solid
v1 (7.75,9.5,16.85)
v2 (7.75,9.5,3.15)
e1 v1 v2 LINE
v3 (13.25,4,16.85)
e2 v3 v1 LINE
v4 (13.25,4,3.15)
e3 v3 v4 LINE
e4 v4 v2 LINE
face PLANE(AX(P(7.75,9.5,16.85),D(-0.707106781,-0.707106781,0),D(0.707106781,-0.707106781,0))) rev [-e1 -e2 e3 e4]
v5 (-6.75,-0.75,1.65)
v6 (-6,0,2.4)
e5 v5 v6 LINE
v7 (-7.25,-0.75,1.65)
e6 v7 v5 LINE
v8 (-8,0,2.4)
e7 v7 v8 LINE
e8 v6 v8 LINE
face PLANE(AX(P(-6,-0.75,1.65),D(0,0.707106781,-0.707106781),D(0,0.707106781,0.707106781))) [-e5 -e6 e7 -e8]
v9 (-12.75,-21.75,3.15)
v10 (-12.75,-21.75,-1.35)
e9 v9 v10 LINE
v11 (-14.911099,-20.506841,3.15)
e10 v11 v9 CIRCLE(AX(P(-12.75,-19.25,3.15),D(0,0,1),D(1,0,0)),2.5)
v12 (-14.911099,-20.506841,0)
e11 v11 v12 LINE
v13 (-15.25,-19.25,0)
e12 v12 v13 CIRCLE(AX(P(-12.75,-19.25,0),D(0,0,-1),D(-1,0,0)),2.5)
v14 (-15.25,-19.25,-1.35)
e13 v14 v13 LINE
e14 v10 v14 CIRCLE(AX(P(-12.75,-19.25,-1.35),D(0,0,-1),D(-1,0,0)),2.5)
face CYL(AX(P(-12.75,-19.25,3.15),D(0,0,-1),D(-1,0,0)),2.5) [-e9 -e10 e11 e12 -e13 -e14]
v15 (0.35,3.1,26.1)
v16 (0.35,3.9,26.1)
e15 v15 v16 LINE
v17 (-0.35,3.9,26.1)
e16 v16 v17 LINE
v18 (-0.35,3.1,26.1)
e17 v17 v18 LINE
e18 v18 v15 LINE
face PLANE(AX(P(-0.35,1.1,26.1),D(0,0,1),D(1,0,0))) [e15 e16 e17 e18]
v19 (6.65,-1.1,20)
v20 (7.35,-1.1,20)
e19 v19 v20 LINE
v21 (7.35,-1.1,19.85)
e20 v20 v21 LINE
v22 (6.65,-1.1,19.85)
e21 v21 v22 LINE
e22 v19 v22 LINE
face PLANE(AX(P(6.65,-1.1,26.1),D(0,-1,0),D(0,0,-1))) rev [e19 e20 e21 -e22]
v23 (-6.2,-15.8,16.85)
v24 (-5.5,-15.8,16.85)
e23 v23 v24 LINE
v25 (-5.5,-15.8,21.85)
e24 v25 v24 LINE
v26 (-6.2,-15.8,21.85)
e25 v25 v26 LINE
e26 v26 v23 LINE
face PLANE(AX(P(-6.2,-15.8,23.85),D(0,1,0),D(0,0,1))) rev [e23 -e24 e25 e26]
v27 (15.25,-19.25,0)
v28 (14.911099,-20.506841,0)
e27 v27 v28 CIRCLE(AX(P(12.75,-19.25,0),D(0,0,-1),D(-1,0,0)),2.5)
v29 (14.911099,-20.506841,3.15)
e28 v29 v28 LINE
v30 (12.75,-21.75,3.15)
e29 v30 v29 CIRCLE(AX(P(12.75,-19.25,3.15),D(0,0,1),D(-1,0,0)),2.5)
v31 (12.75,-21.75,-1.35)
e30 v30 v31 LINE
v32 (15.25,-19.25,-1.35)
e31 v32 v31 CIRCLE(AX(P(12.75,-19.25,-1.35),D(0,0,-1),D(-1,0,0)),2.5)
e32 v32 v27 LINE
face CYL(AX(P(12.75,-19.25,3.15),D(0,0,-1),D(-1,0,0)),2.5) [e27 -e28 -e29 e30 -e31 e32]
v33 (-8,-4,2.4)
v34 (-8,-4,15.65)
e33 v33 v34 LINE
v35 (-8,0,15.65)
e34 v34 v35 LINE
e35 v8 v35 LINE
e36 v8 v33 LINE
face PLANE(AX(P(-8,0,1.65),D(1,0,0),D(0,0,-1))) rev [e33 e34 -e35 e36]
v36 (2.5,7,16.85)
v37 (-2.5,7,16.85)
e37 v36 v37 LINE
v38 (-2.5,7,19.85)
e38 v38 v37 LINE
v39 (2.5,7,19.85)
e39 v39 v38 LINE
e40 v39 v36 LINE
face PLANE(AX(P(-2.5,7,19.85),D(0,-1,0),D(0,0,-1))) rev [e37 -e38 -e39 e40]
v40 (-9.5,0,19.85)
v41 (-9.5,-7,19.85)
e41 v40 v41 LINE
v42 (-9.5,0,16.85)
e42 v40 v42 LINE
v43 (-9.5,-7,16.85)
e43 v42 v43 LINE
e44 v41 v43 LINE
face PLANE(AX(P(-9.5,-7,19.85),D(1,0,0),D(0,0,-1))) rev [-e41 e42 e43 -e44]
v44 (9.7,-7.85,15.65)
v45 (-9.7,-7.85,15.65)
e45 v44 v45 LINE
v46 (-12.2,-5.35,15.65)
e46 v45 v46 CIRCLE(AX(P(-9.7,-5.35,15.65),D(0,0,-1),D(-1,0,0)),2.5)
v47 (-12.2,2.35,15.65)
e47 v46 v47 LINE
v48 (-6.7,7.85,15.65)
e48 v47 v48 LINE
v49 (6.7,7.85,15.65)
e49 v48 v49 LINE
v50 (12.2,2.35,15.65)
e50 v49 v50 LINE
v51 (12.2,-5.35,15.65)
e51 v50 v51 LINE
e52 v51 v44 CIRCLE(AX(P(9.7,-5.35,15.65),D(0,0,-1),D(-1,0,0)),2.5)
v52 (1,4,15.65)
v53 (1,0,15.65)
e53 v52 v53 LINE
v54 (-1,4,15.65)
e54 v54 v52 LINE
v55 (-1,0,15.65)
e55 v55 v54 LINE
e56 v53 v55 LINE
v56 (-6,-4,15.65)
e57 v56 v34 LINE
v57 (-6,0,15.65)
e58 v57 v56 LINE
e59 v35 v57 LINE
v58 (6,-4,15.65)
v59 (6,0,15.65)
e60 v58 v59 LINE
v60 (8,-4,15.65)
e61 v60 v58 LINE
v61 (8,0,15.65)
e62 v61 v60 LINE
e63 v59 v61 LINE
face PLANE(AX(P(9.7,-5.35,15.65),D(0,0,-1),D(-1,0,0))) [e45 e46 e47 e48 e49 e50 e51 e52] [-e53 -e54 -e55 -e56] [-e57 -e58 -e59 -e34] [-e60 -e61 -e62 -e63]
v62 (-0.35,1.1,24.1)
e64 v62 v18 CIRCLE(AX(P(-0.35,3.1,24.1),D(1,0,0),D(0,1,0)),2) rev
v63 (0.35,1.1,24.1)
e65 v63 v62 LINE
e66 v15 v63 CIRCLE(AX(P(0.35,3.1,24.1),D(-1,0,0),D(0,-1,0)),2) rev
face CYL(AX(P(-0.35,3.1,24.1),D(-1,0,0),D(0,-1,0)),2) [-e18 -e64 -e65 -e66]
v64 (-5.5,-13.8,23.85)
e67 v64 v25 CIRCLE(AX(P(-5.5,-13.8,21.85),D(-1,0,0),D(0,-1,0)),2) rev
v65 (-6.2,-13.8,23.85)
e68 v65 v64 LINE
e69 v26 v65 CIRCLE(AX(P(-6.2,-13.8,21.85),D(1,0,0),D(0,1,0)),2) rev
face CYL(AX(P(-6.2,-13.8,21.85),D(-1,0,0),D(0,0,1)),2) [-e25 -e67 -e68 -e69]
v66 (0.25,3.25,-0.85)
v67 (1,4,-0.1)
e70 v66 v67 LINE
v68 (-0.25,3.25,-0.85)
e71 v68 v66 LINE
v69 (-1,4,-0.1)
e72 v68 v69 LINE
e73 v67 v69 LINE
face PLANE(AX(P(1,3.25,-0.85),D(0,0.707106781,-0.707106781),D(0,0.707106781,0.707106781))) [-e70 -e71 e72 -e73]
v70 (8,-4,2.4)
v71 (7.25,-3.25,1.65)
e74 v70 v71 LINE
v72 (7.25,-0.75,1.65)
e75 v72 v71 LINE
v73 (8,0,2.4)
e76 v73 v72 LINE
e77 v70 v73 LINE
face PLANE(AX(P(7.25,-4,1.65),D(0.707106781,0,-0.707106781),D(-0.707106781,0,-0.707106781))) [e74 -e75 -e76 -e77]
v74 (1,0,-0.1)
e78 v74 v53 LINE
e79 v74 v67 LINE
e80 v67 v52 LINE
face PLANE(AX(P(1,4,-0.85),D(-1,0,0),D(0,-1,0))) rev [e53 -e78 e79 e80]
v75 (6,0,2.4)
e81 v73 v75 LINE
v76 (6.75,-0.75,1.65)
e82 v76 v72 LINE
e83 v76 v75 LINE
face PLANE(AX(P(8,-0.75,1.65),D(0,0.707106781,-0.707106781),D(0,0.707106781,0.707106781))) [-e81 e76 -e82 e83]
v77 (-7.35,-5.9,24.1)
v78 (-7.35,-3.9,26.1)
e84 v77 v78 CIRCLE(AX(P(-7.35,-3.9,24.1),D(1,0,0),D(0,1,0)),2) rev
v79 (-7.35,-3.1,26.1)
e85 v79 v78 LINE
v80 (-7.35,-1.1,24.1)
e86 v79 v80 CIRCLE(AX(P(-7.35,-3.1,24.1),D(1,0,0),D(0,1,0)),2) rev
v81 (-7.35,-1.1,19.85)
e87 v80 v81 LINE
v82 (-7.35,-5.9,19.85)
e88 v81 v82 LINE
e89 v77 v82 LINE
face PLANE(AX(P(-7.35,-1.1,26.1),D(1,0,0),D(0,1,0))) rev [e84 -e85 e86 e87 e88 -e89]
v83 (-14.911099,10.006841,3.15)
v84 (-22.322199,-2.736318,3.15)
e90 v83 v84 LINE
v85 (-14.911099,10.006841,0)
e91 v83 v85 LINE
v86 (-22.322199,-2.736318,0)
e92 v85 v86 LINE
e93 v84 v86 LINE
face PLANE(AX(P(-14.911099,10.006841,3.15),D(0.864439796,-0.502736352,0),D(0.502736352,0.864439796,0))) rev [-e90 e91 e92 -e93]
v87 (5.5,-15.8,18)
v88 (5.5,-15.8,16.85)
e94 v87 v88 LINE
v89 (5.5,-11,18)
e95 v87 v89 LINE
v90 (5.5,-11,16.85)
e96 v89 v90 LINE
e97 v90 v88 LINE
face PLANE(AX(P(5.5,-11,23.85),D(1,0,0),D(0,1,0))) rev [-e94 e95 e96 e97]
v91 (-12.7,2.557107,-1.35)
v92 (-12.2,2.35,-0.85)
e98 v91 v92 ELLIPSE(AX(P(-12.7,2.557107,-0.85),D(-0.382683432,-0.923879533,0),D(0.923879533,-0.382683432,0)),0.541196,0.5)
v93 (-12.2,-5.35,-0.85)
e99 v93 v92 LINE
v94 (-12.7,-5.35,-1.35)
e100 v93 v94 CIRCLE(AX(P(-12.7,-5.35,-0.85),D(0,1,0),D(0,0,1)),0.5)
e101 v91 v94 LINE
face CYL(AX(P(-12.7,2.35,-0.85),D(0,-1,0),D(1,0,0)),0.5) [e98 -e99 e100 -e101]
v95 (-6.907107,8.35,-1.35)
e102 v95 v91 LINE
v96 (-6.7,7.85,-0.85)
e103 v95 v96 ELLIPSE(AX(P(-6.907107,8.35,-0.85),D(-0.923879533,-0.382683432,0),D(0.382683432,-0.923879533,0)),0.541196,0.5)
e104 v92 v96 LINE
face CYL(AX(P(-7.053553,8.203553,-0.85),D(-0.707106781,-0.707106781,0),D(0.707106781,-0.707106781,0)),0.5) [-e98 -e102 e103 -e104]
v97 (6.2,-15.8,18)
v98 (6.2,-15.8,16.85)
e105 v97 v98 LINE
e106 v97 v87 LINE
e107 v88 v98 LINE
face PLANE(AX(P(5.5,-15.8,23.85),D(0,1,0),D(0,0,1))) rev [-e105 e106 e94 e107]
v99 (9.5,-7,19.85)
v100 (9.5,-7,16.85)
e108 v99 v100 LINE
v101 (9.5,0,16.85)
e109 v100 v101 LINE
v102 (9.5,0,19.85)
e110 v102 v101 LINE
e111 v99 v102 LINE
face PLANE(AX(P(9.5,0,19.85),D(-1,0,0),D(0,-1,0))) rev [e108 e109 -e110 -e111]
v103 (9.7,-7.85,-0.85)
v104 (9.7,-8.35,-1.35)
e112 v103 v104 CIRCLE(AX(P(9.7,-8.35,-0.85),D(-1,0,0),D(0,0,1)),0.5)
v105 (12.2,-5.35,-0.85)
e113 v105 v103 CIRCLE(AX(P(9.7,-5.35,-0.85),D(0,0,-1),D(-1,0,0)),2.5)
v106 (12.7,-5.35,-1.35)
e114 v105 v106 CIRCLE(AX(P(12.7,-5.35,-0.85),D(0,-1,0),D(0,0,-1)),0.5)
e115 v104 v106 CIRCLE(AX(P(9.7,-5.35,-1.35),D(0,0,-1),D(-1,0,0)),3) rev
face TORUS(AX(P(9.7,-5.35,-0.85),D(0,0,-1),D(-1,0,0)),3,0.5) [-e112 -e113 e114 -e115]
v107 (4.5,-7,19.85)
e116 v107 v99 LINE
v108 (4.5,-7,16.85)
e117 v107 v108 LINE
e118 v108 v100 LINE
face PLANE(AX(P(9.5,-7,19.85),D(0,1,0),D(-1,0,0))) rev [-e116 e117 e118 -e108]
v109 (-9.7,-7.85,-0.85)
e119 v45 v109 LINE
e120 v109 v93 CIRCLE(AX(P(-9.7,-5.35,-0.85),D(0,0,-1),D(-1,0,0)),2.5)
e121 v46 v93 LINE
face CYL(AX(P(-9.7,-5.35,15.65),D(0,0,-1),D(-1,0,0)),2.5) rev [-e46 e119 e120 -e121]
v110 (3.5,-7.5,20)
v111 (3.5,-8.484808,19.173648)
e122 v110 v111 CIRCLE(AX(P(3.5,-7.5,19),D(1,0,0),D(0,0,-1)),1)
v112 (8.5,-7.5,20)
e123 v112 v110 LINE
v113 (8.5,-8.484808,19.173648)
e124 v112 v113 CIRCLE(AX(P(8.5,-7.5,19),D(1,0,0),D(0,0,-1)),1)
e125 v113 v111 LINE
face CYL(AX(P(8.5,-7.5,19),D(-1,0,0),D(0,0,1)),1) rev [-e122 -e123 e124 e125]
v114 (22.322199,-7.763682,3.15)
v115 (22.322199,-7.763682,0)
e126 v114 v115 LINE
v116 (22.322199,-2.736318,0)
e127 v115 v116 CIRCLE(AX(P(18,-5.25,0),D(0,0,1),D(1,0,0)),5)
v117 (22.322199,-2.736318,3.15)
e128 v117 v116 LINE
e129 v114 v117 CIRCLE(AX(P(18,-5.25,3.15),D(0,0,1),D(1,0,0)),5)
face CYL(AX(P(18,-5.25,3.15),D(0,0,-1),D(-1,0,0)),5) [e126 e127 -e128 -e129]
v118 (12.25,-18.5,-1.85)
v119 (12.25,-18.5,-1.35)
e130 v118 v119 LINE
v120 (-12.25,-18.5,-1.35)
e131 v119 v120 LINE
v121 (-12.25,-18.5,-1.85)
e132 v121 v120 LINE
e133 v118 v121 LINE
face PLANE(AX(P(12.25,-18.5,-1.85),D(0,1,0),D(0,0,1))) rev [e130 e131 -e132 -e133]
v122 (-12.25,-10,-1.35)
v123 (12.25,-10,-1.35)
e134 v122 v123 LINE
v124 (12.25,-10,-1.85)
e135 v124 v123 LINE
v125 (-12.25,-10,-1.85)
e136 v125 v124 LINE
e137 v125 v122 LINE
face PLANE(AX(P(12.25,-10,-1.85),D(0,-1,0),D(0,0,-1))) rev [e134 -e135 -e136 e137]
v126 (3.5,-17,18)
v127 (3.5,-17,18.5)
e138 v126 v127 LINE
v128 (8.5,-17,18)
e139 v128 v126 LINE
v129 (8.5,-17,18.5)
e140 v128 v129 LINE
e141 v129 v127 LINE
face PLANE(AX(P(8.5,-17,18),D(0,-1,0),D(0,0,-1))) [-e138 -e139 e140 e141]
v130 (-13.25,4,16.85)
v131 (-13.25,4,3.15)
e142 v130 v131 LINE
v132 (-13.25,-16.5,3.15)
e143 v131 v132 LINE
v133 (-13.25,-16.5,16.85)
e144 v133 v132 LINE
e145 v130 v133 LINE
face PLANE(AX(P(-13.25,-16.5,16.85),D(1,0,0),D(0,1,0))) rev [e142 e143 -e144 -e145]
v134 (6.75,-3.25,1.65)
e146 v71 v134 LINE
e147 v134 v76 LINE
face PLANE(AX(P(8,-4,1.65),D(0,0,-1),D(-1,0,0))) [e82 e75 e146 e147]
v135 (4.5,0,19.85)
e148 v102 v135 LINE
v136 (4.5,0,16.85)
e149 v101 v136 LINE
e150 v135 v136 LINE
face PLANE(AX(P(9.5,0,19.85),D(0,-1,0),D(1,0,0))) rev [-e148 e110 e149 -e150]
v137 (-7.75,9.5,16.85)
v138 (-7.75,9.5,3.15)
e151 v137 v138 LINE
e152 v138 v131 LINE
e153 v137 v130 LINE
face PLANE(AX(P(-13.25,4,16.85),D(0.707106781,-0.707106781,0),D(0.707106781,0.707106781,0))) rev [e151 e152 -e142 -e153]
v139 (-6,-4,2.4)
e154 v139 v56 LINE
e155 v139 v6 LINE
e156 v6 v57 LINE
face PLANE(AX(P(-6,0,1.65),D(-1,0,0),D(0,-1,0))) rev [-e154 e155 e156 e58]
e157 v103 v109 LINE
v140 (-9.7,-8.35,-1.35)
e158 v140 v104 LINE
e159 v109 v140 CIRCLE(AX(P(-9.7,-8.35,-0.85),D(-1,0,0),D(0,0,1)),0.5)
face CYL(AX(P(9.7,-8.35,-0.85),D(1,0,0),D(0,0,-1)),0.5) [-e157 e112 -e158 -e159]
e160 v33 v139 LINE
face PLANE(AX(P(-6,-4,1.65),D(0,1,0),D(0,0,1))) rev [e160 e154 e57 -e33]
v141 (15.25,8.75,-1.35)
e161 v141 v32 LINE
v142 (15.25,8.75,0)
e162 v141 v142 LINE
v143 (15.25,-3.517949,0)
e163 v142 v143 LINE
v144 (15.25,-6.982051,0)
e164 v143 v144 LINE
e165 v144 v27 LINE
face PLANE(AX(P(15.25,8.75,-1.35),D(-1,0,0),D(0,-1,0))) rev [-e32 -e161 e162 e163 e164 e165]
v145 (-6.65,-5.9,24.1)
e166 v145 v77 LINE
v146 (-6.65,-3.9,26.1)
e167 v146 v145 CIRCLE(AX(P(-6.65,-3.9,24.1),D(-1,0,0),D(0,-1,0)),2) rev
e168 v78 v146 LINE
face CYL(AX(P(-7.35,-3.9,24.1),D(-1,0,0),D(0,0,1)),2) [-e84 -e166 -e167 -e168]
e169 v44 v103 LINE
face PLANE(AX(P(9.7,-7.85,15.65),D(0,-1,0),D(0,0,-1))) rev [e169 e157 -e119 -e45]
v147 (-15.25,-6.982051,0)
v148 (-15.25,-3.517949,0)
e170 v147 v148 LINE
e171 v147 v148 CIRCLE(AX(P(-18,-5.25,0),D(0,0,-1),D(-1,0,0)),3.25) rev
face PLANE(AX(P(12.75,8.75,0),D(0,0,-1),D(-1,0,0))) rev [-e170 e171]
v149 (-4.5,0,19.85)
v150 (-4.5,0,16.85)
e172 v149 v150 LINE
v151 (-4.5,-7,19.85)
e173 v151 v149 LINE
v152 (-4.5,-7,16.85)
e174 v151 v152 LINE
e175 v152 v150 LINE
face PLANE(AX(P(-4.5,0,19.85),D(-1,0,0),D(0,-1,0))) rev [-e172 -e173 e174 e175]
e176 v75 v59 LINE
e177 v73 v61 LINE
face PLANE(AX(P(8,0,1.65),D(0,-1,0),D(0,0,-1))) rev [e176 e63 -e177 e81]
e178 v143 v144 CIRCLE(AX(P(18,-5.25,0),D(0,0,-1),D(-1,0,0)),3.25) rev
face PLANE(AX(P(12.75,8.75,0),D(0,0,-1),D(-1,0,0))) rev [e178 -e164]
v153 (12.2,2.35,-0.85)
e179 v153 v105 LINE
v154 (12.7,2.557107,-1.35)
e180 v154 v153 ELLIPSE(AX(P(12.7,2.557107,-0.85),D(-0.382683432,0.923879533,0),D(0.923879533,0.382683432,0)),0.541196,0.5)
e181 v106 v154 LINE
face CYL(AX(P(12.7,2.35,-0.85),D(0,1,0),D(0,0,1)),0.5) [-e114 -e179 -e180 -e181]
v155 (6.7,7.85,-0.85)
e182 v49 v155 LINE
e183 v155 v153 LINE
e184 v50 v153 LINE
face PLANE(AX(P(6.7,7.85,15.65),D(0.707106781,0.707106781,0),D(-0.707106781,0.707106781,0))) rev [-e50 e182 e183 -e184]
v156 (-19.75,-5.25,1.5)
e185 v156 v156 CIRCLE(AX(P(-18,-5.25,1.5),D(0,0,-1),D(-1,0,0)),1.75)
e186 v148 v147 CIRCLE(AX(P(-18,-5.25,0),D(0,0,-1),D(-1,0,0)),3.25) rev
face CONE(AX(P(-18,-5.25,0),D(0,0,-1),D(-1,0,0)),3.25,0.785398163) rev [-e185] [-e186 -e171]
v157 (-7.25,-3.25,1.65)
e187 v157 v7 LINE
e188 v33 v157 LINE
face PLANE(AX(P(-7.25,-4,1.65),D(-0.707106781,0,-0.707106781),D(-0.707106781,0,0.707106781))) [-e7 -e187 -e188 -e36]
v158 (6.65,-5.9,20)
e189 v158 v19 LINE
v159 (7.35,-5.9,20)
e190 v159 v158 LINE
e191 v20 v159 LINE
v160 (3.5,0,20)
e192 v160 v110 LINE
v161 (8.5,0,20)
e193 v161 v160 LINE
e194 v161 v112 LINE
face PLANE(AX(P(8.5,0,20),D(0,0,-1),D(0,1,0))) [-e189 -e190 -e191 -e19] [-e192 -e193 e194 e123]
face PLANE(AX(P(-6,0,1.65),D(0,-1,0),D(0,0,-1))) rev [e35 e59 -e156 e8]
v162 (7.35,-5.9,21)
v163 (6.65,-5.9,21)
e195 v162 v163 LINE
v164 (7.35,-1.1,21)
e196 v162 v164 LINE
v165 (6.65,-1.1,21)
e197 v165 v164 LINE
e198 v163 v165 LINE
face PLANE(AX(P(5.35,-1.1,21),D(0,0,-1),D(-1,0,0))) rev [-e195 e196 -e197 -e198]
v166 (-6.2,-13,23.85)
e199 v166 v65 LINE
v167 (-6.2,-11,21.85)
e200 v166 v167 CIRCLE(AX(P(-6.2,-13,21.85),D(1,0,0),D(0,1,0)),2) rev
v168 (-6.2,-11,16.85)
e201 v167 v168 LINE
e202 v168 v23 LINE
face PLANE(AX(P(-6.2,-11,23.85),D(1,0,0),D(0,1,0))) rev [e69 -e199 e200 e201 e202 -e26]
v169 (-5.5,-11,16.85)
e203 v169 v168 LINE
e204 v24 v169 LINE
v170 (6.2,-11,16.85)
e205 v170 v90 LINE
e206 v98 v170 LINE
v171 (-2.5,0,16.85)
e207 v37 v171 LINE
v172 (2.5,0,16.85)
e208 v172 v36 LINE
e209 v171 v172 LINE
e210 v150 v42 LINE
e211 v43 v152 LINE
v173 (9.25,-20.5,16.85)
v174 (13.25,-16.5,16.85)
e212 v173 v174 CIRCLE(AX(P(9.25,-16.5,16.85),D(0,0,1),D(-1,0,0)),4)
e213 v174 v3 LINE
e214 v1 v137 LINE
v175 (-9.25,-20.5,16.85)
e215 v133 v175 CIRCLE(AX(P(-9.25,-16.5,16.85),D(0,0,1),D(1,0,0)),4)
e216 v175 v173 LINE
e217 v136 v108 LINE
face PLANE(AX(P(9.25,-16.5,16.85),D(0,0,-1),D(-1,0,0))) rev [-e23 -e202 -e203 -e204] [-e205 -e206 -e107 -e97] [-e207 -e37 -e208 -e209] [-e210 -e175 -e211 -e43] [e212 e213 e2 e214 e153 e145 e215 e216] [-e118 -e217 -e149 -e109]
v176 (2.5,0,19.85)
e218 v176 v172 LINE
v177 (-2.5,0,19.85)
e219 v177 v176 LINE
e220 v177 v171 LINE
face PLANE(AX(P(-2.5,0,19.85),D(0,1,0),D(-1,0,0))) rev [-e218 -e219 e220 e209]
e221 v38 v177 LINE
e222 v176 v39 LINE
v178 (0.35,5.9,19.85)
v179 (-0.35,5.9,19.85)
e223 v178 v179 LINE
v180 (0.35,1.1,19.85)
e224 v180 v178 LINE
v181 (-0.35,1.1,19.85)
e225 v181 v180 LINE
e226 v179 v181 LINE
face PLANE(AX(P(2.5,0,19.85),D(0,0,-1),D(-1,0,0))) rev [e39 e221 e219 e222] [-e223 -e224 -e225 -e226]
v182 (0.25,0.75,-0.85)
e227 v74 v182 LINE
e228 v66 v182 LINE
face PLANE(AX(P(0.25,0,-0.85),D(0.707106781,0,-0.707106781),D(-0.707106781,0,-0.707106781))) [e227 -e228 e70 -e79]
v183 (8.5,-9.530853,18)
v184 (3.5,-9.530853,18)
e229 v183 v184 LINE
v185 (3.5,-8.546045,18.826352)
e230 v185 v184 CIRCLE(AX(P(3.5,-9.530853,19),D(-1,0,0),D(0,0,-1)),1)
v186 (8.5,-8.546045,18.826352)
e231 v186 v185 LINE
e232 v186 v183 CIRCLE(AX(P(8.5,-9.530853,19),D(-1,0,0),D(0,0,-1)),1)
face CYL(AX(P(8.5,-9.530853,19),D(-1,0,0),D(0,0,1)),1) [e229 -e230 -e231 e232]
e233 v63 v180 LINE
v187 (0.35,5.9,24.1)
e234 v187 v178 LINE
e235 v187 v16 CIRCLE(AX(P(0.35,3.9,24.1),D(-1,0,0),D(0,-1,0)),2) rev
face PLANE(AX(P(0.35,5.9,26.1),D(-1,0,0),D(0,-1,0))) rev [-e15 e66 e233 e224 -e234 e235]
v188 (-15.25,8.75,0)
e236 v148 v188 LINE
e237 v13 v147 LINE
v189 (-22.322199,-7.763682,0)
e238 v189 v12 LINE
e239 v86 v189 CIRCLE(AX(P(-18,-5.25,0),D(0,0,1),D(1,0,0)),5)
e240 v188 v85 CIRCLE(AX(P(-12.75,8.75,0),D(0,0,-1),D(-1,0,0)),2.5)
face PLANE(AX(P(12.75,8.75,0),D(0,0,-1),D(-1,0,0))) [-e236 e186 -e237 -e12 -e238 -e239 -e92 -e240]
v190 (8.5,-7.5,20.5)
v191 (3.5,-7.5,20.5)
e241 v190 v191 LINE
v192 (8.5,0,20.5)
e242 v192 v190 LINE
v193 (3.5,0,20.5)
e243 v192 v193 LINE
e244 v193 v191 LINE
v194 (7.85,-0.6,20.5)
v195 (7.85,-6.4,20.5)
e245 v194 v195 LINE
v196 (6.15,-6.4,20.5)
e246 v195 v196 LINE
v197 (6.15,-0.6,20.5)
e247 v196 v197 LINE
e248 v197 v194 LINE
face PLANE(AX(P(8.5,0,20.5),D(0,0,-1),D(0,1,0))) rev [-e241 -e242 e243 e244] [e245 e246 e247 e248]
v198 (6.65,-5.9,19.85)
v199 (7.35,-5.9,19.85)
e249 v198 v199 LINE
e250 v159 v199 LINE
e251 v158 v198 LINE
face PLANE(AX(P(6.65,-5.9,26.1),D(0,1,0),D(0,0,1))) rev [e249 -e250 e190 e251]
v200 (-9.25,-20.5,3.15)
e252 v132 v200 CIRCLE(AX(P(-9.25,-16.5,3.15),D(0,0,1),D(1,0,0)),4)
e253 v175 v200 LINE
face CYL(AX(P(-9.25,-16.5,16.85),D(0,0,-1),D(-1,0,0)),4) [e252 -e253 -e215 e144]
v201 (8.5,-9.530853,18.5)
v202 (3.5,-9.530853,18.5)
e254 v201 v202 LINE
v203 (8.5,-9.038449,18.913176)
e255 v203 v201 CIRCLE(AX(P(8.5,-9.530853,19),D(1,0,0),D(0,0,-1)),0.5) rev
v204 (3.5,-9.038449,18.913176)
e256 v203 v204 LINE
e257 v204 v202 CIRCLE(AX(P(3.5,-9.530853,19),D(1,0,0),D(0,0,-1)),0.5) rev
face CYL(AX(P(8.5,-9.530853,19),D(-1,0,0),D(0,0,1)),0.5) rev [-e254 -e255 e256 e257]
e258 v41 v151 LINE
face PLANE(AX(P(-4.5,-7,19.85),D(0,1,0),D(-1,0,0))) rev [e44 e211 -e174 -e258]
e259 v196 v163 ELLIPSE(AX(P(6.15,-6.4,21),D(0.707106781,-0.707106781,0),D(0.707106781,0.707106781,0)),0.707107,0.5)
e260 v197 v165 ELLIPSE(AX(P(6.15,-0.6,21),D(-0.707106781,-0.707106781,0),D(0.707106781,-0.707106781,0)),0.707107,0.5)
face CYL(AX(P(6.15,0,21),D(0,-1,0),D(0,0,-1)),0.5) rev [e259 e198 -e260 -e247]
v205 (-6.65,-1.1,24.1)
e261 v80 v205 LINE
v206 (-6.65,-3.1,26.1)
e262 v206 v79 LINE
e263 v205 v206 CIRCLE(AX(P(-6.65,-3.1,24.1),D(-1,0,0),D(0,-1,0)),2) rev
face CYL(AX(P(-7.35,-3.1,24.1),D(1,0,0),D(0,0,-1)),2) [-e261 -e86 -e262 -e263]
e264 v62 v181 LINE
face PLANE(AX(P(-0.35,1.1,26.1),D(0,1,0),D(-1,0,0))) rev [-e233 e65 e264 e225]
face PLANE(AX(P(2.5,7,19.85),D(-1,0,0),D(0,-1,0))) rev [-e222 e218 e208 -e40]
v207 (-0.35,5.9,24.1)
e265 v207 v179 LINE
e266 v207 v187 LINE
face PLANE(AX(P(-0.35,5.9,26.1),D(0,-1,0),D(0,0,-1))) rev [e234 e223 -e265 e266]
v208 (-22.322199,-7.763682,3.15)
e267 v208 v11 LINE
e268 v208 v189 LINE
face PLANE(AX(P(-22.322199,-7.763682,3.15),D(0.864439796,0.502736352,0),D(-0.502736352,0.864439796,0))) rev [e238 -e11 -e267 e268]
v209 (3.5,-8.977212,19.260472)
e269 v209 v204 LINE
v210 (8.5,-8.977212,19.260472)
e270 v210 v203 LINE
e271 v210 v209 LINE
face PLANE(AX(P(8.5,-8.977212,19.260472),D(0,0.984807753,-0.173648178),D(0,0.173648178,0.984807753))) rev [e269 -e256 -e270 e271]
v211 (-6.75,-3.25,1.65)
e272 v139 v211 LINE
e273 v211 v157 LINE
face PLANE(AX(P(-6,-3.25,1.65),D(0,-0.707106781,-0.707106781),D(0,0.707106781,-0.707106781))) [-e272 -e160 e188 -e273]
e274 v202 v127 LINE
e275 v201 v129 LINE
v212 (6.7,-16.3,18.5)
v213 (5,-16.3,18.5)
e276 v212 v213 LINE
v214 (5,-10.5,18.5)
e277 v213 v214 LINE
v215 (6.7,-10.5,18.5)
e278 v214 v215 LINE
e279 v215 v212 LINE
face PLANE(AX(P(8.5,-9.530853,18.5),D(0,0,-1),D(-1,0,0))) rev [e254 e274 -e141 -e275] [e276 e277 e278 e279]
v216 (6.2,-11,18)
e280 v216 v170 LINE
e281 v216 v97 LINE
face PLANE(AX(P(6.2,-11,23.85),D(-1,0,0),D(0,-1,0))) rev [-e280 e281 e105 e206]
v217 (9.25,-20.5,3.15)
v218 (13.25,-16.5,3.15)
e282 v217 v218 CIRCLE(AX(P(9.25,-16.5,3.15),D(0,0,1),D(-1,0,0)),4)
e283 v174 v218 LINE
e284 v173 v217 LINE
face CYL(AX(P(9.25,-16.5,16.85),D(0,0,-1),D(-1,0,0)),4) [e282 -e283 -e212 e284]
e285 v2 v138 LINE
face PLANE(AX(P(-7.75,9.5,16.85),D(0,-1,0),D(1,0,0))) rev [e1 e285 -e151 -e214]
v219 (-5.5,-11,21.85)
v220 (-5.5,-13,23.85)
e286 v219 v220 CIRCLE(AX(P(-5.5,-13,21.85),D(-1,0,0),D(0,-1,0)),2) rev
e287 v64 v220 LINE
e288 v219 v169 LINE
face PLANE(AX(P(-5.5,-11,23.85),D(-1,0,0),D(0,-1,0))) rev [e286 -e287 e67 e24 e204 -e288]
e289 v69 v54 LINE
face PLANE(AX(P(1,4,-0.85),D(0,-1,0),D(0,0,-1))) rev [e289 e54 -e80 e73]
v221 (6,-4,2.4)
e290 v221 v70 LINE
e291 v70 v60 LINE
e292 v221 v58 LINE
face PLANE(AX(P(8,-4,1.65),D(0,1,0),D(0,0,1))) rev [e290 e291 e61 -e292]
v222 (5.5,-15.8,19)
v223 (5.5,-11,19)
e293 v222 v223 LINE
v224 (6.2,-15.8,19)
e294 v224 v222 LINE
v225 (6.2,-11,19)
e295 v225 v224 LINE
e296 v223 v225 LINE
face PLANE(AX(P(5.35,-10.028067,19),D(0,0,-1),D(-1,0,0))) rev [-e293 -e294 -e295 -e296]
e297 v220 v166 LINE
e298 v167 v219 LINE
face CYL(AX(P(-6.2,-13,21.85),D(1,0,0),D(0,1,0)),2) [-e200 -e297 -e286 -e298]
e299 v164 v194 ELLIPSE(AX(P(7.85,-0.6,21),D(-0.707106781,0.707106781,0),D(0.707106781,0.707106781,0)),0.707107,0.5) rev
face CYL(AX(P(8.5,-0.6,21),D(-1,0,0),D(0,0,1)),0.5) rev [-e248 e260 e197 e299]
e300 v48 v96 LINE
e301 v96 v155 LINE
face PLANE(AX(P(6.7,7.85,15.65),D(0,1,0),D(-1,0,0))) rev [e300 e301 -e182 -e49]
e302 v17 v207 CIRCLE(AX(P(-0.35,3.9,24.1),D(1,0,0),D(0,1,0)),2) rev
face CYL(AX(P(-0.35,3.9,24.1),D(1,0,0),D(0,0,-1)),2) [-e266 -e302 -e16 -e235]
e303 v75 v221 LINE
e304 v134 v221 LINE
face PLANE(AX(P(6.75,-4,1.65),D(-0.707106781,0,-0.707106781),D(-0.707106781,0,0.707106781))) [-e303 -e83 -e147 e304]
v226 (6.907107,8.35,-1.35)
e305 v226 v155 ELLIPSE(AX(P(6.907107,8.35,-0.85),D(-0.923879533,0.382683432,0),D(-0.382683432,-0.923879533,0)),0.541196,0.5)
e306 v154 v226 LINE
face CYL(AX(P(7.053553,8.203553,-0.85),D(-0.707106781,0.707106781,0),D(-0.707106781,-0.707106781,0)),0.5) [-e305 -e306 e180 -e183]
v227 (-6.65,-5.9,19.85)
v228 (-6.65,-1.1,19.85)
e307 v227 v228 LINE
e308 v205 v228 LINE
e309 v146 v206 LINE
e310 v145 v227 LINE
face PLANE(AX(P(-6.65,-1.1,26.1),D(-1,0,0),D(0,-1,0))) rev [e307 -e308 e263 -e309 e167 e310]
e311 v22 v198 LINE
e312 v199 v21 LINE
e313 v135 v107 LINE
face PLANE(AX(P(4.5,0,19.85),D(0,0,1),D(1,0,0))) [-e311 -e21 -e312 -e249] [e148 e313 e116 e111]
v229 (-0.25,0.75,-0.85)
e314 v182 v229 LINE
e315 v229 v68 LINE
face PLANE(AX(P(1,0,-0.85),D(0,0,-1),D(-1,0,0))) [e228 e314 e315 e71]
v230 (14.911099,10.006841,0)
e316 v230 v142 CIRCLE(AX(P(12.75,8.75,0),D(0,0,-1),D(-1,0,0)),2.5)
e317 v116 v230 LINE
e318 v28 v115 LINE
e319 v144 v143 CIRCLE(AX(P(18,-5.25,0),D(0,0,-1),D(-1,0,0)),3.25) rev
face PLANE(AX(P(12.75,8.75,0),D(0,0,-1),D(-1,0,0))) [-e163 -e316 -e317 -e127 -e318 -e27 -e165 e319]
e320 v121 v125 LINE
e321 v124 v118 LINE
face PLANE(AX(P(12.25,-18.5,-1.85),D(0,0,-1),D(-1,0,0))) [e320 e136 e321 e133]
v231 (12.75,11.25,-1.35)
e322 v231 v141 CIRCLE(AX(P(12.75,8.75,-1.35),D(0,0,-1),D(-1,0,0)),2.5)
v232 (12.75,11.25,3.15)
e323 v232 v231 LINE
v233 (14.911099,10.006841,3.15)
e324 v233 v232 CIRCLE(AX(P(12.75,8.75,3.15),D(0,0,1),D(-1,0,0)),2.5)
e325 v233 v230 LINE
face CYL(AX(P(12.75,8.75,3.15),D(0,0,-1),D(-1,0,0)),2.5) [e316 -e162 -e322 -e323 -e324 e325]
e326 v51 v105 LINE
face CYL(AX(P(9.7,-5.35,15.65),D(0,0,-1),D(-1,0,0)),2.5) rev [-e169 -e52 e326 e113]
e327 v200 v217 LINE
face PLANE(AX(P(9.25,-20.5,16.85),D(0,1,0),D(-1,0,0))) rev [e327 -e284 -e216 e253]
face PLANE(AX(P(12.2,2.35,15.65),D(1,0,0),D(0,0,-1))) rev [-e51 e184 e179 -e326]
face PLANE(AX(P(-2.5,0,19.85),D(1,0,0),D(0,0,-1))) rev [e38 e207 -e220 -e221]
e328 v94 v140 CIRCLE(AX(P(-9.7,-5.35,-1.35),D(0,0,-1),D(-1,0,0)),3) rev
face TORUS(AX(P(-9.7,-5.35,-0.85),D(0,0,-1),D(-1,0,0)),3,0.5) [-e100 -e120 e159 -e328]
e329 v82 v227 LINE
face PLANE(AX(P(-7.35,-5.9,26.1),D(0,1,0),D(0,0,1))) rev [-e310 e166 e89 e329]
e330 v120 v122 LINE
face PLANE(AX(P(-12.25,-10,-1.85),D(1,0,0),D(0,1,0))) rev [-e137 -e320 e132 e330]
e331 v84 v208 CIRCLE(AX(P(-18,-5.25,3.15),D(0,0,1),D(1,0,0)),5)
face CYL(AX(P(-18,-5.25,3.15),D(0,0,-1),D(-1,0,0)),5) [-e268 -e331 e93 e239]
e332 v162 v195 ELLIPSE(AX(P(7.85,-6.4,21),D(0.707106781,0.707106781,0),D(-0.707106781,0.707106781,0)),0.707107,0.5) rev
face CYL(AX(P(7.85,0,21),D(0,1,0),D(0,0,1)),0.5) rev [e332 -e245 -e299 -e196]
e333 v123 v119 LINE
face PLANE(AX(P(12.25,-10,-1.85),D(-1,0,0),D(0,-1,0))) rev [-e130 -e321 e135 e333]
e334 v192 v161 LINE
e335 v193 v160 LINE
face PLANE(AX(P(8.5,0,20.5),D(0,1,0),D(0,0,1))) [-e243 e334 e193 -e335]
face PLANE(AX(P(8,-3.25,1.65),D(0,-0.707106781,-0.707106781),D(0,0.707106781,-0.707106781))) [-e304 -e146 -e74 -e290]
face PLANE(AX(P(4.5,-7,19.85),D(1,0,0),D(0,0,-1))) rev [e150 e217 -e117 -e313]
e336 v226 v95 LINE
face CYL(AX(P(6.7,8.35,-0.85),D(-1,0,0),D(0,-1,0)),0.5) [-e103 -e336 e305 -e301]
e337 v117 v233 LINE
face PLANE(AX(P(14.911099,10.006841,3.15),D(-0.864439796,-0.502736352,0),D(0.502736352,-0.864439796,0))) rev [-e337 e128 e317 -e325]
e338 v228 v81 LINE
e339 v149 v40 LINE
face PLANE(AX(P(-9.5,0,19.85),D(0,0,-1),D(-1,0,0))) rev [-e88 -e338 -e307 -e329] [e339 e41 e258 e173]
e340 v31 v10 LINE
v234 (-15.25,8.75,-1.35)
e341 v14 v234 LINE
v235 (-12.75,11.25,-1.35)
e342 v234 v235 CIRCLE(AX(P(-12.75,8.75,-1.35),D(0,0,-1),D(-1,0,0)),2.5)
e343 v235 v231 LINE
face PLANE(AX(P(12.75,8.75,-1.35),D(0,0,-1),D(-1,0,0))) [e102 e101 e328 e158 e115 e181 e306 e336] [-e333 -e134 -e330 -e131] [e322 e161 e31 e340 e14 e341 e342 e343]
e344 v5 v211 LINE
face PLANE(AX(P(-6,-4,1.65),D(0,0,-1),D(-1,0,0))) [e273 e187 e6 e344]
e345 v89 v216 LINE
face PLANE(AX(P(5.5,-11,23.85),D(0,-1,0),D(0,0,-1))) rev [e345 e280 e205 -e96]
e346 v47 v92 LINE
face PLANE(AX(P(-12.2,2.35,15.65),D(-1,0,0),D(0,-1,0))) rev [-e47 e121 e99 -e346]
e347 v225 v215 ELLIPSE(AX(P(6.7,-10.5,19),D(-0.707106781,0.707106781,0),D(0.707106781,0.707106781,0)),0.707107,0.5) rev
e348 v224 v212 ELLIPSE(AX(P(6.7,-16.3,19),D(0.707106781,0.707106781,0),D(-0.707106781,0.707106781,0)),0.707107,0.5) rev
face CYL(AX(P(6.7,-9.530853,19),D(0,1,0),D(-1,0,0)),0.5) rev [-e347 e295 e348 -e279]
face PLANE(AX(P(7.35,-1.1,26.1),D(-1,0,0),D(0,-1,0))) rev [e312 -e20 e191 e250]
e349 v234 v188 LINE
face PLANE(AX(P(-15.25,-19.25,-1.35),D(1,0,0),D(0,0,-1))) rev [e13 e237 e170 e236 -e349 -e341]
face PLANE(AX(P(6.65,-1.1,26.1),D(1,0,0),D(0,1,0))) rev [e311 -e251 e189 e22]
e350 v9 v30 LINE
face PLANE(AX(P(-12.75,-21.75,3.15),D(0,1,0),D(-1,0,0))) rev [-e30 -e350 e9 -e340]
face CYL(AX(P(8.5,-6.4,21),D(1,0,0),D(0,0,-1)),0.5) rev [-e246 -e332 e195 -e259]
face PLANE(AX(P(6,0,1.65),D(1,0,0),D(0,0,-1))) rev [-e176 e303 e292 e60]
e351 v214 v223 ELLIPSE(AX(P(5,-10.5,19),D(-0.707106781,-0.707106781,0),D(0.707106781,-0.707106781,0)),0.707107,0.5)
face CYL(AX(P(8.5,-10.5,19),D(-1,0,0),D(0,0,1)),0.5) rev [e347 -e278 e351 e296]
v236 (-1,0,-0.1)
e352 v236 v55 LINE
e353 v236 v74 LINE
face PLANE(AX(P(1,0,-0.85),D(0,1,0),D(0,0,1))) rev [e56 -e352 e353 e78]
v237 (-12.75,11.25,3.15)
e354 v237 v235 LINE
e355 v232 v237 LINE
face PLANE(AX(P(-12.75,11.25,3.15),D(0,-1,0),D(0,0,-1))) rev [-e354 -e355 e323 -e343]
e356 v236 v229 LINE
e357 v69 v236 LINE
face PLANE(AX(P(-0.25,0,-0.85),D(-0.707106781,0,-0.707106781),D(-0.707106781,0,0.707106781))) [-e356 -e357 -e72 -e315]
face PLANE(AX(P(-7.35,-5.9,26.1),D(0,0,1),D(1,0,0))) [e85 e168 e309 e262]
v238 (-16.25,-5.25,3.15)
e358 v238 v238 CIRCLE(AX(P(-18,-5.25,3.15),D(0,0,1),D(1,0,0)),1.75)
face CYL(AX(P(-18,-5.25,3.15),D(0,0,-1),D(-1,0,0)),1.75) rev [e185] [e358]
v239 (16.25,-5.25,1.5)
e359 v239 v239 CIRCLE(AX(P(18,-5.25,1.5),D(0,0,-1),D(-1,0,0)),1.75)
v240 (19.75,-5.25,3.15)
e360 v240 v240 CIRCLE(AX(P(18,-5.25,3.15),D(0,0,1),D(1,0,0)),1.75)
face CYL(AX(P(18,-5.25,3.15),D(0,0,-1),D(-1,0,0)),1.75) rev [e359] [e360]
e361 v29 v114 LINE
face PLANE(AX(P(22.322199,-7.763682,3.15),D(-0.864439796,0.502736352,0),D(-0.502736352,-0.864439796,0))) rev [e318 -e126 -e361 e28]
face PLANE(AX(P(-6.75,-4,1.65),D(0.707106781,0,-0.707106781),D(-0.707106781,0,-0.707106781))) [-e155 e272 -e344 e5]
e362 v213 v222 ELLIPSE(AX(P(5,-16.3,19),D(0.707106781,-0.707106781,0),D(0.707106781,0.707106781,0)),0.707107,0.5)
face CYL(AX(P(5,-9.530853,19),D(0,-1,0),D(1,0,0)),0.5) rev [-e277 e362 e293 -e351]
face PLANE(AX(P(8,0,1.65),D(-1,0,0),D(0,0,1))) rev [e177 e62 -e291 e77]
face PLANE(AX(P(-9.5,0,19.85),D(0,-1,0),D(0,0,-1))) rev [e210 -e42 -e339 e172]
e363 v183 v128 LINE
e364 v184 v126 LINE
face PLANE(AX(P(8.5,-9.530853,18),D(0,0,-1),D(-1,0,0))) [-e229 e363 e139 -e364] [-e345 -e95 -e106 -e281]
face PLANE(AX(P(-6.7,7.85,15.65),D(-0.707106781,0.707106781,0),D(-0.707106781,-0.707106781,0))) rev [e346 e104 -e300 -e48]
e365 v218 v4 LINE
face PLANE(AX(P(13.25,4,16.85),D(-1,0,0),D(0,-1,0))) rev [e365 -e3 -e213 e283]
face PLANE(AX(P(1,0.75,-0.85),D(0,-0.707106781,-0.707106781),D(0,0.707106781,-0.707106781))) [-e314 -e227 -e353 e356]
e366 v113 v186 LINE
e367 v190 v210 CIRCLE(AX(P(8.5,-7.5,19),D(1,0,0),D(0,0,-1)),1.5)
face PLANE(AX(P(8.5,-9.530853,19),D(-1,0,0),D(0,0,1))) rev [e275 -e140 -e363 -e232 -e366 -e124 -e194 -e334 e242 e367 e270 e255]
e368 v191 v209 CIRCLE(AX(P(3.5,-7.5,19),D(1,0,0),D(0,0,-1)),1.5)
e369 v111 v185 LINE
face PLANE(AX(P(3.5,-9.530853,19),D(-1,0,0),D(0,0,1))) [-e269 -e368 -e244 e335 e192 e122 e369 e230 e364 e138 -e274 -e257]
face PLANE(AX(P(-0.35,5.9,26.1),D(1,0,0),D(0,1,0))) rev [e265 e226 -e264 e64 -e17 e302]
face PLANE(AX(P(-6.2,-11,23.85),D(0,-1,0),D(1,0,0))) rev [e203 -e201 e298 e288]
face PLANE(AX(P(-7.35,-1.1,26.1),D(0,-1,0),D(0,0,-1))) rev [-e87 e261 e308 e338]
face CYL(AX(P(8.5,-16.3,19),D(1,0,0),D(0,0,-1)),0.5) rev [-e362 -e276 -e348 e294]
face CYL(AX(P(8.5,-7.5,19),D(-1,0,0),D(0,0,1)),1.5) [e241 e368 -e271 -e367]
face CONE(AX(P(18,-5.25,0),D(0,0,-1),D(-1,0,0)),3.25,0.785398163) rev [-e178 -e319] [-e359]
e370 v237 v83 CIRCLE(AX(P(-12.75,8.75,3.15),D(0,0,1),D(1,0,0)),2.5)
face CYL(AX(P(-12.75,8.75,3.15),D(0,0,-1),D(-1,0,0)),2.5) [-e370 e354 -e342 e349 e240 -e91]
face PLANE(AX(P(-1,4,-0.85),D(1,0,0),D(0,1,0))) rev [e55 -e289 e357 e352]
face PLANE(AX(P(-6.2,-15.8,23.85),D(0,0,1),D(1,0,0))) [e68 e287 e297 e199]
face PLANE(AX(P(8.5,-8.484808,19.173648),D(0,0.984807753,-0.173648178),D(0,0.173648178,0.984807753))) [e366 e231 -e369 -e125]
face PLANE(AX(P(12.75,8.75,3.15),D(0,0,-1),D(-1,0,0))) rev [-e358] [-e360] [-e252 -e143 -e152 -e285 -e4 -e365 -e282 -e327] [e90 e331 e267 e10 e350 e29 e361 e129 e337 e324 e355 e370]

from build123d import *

# Parameters (mm, degrees)
SKETCH1_R           = 1.75
EXTRUDE1_DEPTH      = 3.15
CHAMFER1_SIZE       = 1.5
EXTRUDE2_START      = 1.35
EXTRUDE2_DEPTH      = 1.35
EXTRUDE3_DEPTH      = 13.7
SKETCH4_W           = 5
SKETCH4_H           = 7
EXTRUDE4_DEPTH      = 3
SKETCH5_W           = 0.7
SKETCH5_H           = 4.8
EXTRUDE5_DEPTH      = 6.25
EXTRUDE6_DEPTH      = 17
FILLET1_R           = 0.5
SKETCH7_W           = 2
SKETCH7_H           = 4
EXTRUDE7_DEPTH      = 14
SKETCH8_W           = 2
SKETCH8_H           = 4
EXTRUDE8_DEPTH      = 16.5
CHAMFER3_SIZE       = 0.75
SKETCH9_W           = 0.7
SKETCH9_H           = 4.8
EXTRUDE9_DEPTH      = 7
FILLET2_R           = 2
EXTRUDE_THIN1_DEPTH = 2.5
EXTRUDE10_DEPTH     = 2
FILLET3_R           = 0.5
FILLET4_R           = 0.5
SKETCH13_W          = 24.5
SKETCH13_H          = 8.5
EXTRUDE11_DEPTH     = 0.5


with BuildPart() as part:
    # Sketch1 → Extrude1 (new body)
    with BuildSketch(Plane.XY):
        with BuildLine():
            Line((-12.75, 11.25), (12.75, 11.25))
            ThreePointArc((12.75, 11.25), (13.996574867, 10.917037402), (14.911099489, 10.00684088))
            Line((14.911099489, 10.00684088), (22.322198979, -2.73631824))
            ThreePointArc((22.322198979, -2.73631824), (23, -5.25), (22.322198979, -7.76368176))
            Line((22.322198979, -7.76368176), (14.911099489, -20.50684088))
            ThreePointArc((14.911099489, -20.50684088), (13.996574867, -21.417037402), (12.75, -21.75))
            Line((12.75, -21.75), (-12.75, -21.75))
            ThreePointArc((-12.75, -21.75), (-13.996574867, -21.417037402), (-14.911099489, -20.50684088))
            Line((-14.911099489, -20.50684088), (-22.322198979, -7.76368176))
            ThreePointArc((-22.322198979, -7.76368176), (-23, -5.25), (-22.322198979, -2.73631824))
            Line((-22.322198979, -2.73631824), (-14.911099489, 10.00684088))
            ThreePointArc((-14.911099489, 10.00684088), (-13.996574867, 10.917037402), (-12.75, 11.25))
        make_face()
        with Locations((-18, -5.25)):
            Circle(SKETCH1_R, mode=Mode.SUBTRACT)
        with Locations((18, -5.25)):
            Circle(SKETCH1_R, mode=Mode.SUBTRACT)
    extrude(amount=EXTRUDE1_DEPTH)

    # Chamfer1
    chamfer1_edges = [part.edges().sort_by_distance(p)[0] for p in [
        (-19.75, -5.25, 0),
        (16.25, -5.25, 0),
    ]]
    chamfer(chamfer1_edges, length=CHAMFER1_SIZE)

    # Sketch2 → Extrude2 (add)
    with BuildSketch(Plane(origin=(0, 0, 0), x_dir=(-1, 0, 0), z_dir=(0, 0, -1)).offset(EXTRUDE2_START)):
        with BuildLine():
            Line((-12.75, 11.25), (12.75, 11.25))
            ThreePointArc((12.75, 11.25), (14.517766953, 10.517766953), (15.25, 8.75))
            Line((15.25, 8.75), (15.25, -19.25))
            ThreePointArc((15.25, -19.25), (14.517766953, -21.017766953), (12.75, -21.75))
            Line((12.75, -21.75), (-12.75, -21.75))
            ThreePointArc((-12.75, -21.75), (-14.517766953, -21.017766953), (-15.25, -19.25))
            Line((-15.25, -19.25), (-15.25, 8.75))
            ThreePointArc((-15.25, 8.75), (-14.517766953, 10.517766953), (-12.75, 11.25))
        make_face()
    extrude(amount=-EXTRUDE2_DEPTH)

    # Sketch3 → Extrude3 (add)
    with BuildSketch(Plane.XY.offset(3.15)):
        with BuildLine():
            Line((-7.75, 9.5), (7.75, 9.5))
            Line((7.75, 9.5), (13.25, 4))
            Line((13.25, 4), (13.25, -16.5))
            ThreePointArc((13.25, -16.5), (12.078427125, -19.328427125), (9.25, -20.5))
            Line((9.25, -20.5), (-9.25, -20.5))
            ThreePointArc((-9.25, -20.5), (-12.078427125, -19.328427125), (-13.25, -16.5))
            Line((-13.25, -16.5), (-13.25, 4))
            Line((-13.25, 4), (-7.75, 9.5))
        make_face()
    extrude(amount=EXTRUDE3_DEPTH)

    # Sketch4 → Extrude4 (add)
    with BuildSketch(Plane.XY.offset(16.85)):
        with Locations((-7, -3.5)):
            Rectangle(SKETCH4_W, SKETCH4_H)
        with Locations((0, 3.5)):
            Rectangle(SKETCH4_W, SKETCH4_H)
        with Locations((7, -3.5)):
            Rectangle(SKETCH4_W, SKETCH4_H)
    extrude(amount=EXTRUDE4_DEPTH)

    # Sketch5 → Extrude5 (add)
    with BuildSketch(Plane.XY.offset(19.85)):
        with Locations((0, 3.5)):
            Rectangle(SKETCH5_W, SKETCH5_H)
        with Locations((7, -3.5)):
            Rectangle(SKETCH5_W, SKETCH5_H)
        with Locations((-7, -3.5)):
            Rectangle(SKETCH5_W, SKETCH5_H)
    extrude(amount=EXTRUDE5_DEPTH)

    # Sketch6 → Extrude6 (cut)
    with BuildSketch(Plane(origin=(0, 0, -1.35), x_dir=(-1, 0, 0), z_dir=(0, 0, -1))):
        with BuildLine():
            Line((-6.7, 7.85), (6.7, 7.85))
            Line((6.7, 7.85), (12.2, 2.35))
            Line((12.2, 2.35), (12.2, -5.35))
            ThreePointArc((12.2, -5.35), (11.467766953, -7.117766953), (9.7, -7.85))
            Line((9.7, -7.85), (-9.7, -7.85))
            ThreePointArc((-9.7, -7.85), (-11.467766953, -7.117766953), (-12.2, -5.35))
            Line((-12.2, -5.35), (-12.2, 2.35))
            Line((-12.2, 2.35), (-6.7, 7.85))
        make_face()
    extrude(amount=-EXTRUDE6_DEPTH, mode=Mode.SUBTRACT)

    # Fillet1
    fillet1_edges = [part.edges().sort_by_distance(p)[0] for p in [
        (9.45, 5.1, -1.35),
        (12.2, -1.5, -1.35),
        (11.467766953, -7.117766953, -1.35),
        (0, -7.85, -1.35),
        (-11.467766953, -7.117766953, -1.35),
        (-12.2, -1.5, -1.35),
        (-9.45, 5.1, -1.35),
        (0, 7.85, -1.35),
    ]]
    fillet(fillet1_edges, radius=FILLET1_R)

    # Sketch7 → Extrude7 (add)
    with BuildSketch(Plane(origin=(0, 0, 15.65), x_dir=(-1, 0, 0), z_dir=(0, 0, -1))):
        with Locations((-7, -2)):
            Rectangle(SKETCH7_W, SKETCH7_H)
        with Locations((7, -2)):
            Rectangle(SKETCH7_W, SKETCH7_H)
    extrude(amount=EXTRUDE7_DEPTH)

    # Sketch8 → Extrude8 (add)
    with BuildSketch(Plane(origin=(0, 0, 15.65), x_dir=(-1, 0, 0), z_dir=(0, 0, -1))):
        with Locations((0, 2)):
            Rectangle(SKETCH8_W, SKETCH8_H)
    extrude(amount=EXTRUDE8_DEPTH)

    # Chamfer3
    chamfer3_edges = [part.edges().sort_by_distance(p)[0] for p in [
        (8, -2, 1.65),
        (7, -4, 1.65),
        (6, -2, 1.65),
        (7, 0, 1.65),
        (-6, -2, 1.65),
        (-7, -4, 1.65),
        (-8, -2, 1.65),
        (-7, 0, 1.65),
        (1, 2, -0.85),
        (0, 0, -0.85),
        (-1, 2, -0.85),
        (0, 4, -0.85),
    ]]
    chamfer(chamfer3_edges, length=CHAMFER3_SIZE)

    # Sketch9 → Extrude9 (add)
    with BuildSketch(Plane.XY.offset(16.85)):
        with Locations((-5.85, -13.4)):
            Rectangle(SKETCH9_W, SKETCH9_H)
        with Locations((5.85, -13.4)):
            Rectangle(SKETCH9_W, SKETCH9_H)
    extrude(amount=EXTRUDE9_DEPTH)

    # Fillet2
    fillet2_edges = [part.edges().sort_by_distance(p)[0] for p in [
        (0, 1.1, 26.1),
        (0, 5.9, 26.1),
        (7, -5.9, 26.1),
        (7, -1.1, 26.1),
        (-7, -5.9, 26.1),
        (-7, -1.1, 26.1),
        (-5.85, -15.8, 23.85),
        (-5.85, -11, 23.85),
        (5.85, -15.8, 23.85),
        (5.85, -11, 23.85),
    ]]
    fillet(fillet2_edges, radius=FILLET2_R)

    # Sketch10 → Extrude-Thin1 (add, symmetric)
    with BuildSketch(Plane(origin=(6, 0, 0), x_dir=(0, 0, -1), z_dir=(1, 0, 0))):
        with BuildLine():
            Line((-20, 0), (-20, -7.5))
            ThreePointArc((-20, -7.5), (-19.766044443, -8.14278761), (-19.173648178, -8.484807753))
            Line((-19.173648178, -8.484807753), (-18.826351822, -8.546045471))
            ThreePointArc((-18.826351822, -8.546045471), (-18.233955557, -8.888065614), (-18, -9.530853224))
            Line((-18, -9.530853224), (-18, -17))
            Line((-18, -17), (-18.5, -17))
            Line((-18.5, -17), (-18.5, -9.530853224))
            ThreePointArc((-18.5, -9.530853224), (-18.616977778, -9.209459419), (-18.913175911, -9.038449347))
            Line((-18.913175911, -9.038449347), (-19.260472267, -8.97721163))
            ThreePointArc((-19.260472267, -8.97721163), (-20.149066665, -8.464181415), (-20.5, -7.5))
            Line((-20.5, -7.5), (-20.5, 0))
            Line((-20.5, 0), (-20, 0))
        make_face()
    extrude(amount=EXTRUDE_THIN1_DEPTH, both=True)

    # Sketch12 → Extrude10 (cut)
    with BuildSketch(Plane(origin=(7.35, 0, 0), x_dir=(0, 0, -1), z_dir=(1, 0, 0))):
        Polygon((-21, -1.1), (-21, -10.028067218), (-19, -10.028067218), (-19, -16.1), (-27, -16.1), (-27, -1.1), align=None)
    extrude(amount=-EXTRUDE10_DEPTH, mode=Mode.SUBTRACT)

    # Fillet3
    fillet3_edges = [part.edges().sort_by_distance(p)[0] for p in [
        (5.85, -11, 18.5),
        (5.5, -13.4, 18.5),
        (5.85, -15.8, 18.5),
        (6.2, -13.4, 18.5),
    ]]
    fillet(fillet3_edges, radius=FILLET3_R - 0.0001)  # a hair under: the kernel refuses the full size

    # Fillet4
    fillet4_edges = [part.edges().sort_by_distance(p)[0] for p in [
        (7, -1.1, 20.5),
        (6.65, -3.5, 20.5),
        (7, -5.9, 20.5),
        (7.35, -3.5, 20.5),
    ]]
    fillet(fillet4_edges, radius=FILLET4_R - 0.0001)  # a hair under: the kernel refuses the full size

    # Sketch13 → Extrude11 (add)
    with BuildSketch(Plane(origin=(0, 0, -1.35), x_dir=(-1, 0, 0), z_dir=(0, 0, -1))):
        with Locations((0, -14.25)):
            Rectangle(SKETCH13_W, SKETCH13_H)
    extrude(amount=EXTRUDE11_DEPTH)


solid = part.part
